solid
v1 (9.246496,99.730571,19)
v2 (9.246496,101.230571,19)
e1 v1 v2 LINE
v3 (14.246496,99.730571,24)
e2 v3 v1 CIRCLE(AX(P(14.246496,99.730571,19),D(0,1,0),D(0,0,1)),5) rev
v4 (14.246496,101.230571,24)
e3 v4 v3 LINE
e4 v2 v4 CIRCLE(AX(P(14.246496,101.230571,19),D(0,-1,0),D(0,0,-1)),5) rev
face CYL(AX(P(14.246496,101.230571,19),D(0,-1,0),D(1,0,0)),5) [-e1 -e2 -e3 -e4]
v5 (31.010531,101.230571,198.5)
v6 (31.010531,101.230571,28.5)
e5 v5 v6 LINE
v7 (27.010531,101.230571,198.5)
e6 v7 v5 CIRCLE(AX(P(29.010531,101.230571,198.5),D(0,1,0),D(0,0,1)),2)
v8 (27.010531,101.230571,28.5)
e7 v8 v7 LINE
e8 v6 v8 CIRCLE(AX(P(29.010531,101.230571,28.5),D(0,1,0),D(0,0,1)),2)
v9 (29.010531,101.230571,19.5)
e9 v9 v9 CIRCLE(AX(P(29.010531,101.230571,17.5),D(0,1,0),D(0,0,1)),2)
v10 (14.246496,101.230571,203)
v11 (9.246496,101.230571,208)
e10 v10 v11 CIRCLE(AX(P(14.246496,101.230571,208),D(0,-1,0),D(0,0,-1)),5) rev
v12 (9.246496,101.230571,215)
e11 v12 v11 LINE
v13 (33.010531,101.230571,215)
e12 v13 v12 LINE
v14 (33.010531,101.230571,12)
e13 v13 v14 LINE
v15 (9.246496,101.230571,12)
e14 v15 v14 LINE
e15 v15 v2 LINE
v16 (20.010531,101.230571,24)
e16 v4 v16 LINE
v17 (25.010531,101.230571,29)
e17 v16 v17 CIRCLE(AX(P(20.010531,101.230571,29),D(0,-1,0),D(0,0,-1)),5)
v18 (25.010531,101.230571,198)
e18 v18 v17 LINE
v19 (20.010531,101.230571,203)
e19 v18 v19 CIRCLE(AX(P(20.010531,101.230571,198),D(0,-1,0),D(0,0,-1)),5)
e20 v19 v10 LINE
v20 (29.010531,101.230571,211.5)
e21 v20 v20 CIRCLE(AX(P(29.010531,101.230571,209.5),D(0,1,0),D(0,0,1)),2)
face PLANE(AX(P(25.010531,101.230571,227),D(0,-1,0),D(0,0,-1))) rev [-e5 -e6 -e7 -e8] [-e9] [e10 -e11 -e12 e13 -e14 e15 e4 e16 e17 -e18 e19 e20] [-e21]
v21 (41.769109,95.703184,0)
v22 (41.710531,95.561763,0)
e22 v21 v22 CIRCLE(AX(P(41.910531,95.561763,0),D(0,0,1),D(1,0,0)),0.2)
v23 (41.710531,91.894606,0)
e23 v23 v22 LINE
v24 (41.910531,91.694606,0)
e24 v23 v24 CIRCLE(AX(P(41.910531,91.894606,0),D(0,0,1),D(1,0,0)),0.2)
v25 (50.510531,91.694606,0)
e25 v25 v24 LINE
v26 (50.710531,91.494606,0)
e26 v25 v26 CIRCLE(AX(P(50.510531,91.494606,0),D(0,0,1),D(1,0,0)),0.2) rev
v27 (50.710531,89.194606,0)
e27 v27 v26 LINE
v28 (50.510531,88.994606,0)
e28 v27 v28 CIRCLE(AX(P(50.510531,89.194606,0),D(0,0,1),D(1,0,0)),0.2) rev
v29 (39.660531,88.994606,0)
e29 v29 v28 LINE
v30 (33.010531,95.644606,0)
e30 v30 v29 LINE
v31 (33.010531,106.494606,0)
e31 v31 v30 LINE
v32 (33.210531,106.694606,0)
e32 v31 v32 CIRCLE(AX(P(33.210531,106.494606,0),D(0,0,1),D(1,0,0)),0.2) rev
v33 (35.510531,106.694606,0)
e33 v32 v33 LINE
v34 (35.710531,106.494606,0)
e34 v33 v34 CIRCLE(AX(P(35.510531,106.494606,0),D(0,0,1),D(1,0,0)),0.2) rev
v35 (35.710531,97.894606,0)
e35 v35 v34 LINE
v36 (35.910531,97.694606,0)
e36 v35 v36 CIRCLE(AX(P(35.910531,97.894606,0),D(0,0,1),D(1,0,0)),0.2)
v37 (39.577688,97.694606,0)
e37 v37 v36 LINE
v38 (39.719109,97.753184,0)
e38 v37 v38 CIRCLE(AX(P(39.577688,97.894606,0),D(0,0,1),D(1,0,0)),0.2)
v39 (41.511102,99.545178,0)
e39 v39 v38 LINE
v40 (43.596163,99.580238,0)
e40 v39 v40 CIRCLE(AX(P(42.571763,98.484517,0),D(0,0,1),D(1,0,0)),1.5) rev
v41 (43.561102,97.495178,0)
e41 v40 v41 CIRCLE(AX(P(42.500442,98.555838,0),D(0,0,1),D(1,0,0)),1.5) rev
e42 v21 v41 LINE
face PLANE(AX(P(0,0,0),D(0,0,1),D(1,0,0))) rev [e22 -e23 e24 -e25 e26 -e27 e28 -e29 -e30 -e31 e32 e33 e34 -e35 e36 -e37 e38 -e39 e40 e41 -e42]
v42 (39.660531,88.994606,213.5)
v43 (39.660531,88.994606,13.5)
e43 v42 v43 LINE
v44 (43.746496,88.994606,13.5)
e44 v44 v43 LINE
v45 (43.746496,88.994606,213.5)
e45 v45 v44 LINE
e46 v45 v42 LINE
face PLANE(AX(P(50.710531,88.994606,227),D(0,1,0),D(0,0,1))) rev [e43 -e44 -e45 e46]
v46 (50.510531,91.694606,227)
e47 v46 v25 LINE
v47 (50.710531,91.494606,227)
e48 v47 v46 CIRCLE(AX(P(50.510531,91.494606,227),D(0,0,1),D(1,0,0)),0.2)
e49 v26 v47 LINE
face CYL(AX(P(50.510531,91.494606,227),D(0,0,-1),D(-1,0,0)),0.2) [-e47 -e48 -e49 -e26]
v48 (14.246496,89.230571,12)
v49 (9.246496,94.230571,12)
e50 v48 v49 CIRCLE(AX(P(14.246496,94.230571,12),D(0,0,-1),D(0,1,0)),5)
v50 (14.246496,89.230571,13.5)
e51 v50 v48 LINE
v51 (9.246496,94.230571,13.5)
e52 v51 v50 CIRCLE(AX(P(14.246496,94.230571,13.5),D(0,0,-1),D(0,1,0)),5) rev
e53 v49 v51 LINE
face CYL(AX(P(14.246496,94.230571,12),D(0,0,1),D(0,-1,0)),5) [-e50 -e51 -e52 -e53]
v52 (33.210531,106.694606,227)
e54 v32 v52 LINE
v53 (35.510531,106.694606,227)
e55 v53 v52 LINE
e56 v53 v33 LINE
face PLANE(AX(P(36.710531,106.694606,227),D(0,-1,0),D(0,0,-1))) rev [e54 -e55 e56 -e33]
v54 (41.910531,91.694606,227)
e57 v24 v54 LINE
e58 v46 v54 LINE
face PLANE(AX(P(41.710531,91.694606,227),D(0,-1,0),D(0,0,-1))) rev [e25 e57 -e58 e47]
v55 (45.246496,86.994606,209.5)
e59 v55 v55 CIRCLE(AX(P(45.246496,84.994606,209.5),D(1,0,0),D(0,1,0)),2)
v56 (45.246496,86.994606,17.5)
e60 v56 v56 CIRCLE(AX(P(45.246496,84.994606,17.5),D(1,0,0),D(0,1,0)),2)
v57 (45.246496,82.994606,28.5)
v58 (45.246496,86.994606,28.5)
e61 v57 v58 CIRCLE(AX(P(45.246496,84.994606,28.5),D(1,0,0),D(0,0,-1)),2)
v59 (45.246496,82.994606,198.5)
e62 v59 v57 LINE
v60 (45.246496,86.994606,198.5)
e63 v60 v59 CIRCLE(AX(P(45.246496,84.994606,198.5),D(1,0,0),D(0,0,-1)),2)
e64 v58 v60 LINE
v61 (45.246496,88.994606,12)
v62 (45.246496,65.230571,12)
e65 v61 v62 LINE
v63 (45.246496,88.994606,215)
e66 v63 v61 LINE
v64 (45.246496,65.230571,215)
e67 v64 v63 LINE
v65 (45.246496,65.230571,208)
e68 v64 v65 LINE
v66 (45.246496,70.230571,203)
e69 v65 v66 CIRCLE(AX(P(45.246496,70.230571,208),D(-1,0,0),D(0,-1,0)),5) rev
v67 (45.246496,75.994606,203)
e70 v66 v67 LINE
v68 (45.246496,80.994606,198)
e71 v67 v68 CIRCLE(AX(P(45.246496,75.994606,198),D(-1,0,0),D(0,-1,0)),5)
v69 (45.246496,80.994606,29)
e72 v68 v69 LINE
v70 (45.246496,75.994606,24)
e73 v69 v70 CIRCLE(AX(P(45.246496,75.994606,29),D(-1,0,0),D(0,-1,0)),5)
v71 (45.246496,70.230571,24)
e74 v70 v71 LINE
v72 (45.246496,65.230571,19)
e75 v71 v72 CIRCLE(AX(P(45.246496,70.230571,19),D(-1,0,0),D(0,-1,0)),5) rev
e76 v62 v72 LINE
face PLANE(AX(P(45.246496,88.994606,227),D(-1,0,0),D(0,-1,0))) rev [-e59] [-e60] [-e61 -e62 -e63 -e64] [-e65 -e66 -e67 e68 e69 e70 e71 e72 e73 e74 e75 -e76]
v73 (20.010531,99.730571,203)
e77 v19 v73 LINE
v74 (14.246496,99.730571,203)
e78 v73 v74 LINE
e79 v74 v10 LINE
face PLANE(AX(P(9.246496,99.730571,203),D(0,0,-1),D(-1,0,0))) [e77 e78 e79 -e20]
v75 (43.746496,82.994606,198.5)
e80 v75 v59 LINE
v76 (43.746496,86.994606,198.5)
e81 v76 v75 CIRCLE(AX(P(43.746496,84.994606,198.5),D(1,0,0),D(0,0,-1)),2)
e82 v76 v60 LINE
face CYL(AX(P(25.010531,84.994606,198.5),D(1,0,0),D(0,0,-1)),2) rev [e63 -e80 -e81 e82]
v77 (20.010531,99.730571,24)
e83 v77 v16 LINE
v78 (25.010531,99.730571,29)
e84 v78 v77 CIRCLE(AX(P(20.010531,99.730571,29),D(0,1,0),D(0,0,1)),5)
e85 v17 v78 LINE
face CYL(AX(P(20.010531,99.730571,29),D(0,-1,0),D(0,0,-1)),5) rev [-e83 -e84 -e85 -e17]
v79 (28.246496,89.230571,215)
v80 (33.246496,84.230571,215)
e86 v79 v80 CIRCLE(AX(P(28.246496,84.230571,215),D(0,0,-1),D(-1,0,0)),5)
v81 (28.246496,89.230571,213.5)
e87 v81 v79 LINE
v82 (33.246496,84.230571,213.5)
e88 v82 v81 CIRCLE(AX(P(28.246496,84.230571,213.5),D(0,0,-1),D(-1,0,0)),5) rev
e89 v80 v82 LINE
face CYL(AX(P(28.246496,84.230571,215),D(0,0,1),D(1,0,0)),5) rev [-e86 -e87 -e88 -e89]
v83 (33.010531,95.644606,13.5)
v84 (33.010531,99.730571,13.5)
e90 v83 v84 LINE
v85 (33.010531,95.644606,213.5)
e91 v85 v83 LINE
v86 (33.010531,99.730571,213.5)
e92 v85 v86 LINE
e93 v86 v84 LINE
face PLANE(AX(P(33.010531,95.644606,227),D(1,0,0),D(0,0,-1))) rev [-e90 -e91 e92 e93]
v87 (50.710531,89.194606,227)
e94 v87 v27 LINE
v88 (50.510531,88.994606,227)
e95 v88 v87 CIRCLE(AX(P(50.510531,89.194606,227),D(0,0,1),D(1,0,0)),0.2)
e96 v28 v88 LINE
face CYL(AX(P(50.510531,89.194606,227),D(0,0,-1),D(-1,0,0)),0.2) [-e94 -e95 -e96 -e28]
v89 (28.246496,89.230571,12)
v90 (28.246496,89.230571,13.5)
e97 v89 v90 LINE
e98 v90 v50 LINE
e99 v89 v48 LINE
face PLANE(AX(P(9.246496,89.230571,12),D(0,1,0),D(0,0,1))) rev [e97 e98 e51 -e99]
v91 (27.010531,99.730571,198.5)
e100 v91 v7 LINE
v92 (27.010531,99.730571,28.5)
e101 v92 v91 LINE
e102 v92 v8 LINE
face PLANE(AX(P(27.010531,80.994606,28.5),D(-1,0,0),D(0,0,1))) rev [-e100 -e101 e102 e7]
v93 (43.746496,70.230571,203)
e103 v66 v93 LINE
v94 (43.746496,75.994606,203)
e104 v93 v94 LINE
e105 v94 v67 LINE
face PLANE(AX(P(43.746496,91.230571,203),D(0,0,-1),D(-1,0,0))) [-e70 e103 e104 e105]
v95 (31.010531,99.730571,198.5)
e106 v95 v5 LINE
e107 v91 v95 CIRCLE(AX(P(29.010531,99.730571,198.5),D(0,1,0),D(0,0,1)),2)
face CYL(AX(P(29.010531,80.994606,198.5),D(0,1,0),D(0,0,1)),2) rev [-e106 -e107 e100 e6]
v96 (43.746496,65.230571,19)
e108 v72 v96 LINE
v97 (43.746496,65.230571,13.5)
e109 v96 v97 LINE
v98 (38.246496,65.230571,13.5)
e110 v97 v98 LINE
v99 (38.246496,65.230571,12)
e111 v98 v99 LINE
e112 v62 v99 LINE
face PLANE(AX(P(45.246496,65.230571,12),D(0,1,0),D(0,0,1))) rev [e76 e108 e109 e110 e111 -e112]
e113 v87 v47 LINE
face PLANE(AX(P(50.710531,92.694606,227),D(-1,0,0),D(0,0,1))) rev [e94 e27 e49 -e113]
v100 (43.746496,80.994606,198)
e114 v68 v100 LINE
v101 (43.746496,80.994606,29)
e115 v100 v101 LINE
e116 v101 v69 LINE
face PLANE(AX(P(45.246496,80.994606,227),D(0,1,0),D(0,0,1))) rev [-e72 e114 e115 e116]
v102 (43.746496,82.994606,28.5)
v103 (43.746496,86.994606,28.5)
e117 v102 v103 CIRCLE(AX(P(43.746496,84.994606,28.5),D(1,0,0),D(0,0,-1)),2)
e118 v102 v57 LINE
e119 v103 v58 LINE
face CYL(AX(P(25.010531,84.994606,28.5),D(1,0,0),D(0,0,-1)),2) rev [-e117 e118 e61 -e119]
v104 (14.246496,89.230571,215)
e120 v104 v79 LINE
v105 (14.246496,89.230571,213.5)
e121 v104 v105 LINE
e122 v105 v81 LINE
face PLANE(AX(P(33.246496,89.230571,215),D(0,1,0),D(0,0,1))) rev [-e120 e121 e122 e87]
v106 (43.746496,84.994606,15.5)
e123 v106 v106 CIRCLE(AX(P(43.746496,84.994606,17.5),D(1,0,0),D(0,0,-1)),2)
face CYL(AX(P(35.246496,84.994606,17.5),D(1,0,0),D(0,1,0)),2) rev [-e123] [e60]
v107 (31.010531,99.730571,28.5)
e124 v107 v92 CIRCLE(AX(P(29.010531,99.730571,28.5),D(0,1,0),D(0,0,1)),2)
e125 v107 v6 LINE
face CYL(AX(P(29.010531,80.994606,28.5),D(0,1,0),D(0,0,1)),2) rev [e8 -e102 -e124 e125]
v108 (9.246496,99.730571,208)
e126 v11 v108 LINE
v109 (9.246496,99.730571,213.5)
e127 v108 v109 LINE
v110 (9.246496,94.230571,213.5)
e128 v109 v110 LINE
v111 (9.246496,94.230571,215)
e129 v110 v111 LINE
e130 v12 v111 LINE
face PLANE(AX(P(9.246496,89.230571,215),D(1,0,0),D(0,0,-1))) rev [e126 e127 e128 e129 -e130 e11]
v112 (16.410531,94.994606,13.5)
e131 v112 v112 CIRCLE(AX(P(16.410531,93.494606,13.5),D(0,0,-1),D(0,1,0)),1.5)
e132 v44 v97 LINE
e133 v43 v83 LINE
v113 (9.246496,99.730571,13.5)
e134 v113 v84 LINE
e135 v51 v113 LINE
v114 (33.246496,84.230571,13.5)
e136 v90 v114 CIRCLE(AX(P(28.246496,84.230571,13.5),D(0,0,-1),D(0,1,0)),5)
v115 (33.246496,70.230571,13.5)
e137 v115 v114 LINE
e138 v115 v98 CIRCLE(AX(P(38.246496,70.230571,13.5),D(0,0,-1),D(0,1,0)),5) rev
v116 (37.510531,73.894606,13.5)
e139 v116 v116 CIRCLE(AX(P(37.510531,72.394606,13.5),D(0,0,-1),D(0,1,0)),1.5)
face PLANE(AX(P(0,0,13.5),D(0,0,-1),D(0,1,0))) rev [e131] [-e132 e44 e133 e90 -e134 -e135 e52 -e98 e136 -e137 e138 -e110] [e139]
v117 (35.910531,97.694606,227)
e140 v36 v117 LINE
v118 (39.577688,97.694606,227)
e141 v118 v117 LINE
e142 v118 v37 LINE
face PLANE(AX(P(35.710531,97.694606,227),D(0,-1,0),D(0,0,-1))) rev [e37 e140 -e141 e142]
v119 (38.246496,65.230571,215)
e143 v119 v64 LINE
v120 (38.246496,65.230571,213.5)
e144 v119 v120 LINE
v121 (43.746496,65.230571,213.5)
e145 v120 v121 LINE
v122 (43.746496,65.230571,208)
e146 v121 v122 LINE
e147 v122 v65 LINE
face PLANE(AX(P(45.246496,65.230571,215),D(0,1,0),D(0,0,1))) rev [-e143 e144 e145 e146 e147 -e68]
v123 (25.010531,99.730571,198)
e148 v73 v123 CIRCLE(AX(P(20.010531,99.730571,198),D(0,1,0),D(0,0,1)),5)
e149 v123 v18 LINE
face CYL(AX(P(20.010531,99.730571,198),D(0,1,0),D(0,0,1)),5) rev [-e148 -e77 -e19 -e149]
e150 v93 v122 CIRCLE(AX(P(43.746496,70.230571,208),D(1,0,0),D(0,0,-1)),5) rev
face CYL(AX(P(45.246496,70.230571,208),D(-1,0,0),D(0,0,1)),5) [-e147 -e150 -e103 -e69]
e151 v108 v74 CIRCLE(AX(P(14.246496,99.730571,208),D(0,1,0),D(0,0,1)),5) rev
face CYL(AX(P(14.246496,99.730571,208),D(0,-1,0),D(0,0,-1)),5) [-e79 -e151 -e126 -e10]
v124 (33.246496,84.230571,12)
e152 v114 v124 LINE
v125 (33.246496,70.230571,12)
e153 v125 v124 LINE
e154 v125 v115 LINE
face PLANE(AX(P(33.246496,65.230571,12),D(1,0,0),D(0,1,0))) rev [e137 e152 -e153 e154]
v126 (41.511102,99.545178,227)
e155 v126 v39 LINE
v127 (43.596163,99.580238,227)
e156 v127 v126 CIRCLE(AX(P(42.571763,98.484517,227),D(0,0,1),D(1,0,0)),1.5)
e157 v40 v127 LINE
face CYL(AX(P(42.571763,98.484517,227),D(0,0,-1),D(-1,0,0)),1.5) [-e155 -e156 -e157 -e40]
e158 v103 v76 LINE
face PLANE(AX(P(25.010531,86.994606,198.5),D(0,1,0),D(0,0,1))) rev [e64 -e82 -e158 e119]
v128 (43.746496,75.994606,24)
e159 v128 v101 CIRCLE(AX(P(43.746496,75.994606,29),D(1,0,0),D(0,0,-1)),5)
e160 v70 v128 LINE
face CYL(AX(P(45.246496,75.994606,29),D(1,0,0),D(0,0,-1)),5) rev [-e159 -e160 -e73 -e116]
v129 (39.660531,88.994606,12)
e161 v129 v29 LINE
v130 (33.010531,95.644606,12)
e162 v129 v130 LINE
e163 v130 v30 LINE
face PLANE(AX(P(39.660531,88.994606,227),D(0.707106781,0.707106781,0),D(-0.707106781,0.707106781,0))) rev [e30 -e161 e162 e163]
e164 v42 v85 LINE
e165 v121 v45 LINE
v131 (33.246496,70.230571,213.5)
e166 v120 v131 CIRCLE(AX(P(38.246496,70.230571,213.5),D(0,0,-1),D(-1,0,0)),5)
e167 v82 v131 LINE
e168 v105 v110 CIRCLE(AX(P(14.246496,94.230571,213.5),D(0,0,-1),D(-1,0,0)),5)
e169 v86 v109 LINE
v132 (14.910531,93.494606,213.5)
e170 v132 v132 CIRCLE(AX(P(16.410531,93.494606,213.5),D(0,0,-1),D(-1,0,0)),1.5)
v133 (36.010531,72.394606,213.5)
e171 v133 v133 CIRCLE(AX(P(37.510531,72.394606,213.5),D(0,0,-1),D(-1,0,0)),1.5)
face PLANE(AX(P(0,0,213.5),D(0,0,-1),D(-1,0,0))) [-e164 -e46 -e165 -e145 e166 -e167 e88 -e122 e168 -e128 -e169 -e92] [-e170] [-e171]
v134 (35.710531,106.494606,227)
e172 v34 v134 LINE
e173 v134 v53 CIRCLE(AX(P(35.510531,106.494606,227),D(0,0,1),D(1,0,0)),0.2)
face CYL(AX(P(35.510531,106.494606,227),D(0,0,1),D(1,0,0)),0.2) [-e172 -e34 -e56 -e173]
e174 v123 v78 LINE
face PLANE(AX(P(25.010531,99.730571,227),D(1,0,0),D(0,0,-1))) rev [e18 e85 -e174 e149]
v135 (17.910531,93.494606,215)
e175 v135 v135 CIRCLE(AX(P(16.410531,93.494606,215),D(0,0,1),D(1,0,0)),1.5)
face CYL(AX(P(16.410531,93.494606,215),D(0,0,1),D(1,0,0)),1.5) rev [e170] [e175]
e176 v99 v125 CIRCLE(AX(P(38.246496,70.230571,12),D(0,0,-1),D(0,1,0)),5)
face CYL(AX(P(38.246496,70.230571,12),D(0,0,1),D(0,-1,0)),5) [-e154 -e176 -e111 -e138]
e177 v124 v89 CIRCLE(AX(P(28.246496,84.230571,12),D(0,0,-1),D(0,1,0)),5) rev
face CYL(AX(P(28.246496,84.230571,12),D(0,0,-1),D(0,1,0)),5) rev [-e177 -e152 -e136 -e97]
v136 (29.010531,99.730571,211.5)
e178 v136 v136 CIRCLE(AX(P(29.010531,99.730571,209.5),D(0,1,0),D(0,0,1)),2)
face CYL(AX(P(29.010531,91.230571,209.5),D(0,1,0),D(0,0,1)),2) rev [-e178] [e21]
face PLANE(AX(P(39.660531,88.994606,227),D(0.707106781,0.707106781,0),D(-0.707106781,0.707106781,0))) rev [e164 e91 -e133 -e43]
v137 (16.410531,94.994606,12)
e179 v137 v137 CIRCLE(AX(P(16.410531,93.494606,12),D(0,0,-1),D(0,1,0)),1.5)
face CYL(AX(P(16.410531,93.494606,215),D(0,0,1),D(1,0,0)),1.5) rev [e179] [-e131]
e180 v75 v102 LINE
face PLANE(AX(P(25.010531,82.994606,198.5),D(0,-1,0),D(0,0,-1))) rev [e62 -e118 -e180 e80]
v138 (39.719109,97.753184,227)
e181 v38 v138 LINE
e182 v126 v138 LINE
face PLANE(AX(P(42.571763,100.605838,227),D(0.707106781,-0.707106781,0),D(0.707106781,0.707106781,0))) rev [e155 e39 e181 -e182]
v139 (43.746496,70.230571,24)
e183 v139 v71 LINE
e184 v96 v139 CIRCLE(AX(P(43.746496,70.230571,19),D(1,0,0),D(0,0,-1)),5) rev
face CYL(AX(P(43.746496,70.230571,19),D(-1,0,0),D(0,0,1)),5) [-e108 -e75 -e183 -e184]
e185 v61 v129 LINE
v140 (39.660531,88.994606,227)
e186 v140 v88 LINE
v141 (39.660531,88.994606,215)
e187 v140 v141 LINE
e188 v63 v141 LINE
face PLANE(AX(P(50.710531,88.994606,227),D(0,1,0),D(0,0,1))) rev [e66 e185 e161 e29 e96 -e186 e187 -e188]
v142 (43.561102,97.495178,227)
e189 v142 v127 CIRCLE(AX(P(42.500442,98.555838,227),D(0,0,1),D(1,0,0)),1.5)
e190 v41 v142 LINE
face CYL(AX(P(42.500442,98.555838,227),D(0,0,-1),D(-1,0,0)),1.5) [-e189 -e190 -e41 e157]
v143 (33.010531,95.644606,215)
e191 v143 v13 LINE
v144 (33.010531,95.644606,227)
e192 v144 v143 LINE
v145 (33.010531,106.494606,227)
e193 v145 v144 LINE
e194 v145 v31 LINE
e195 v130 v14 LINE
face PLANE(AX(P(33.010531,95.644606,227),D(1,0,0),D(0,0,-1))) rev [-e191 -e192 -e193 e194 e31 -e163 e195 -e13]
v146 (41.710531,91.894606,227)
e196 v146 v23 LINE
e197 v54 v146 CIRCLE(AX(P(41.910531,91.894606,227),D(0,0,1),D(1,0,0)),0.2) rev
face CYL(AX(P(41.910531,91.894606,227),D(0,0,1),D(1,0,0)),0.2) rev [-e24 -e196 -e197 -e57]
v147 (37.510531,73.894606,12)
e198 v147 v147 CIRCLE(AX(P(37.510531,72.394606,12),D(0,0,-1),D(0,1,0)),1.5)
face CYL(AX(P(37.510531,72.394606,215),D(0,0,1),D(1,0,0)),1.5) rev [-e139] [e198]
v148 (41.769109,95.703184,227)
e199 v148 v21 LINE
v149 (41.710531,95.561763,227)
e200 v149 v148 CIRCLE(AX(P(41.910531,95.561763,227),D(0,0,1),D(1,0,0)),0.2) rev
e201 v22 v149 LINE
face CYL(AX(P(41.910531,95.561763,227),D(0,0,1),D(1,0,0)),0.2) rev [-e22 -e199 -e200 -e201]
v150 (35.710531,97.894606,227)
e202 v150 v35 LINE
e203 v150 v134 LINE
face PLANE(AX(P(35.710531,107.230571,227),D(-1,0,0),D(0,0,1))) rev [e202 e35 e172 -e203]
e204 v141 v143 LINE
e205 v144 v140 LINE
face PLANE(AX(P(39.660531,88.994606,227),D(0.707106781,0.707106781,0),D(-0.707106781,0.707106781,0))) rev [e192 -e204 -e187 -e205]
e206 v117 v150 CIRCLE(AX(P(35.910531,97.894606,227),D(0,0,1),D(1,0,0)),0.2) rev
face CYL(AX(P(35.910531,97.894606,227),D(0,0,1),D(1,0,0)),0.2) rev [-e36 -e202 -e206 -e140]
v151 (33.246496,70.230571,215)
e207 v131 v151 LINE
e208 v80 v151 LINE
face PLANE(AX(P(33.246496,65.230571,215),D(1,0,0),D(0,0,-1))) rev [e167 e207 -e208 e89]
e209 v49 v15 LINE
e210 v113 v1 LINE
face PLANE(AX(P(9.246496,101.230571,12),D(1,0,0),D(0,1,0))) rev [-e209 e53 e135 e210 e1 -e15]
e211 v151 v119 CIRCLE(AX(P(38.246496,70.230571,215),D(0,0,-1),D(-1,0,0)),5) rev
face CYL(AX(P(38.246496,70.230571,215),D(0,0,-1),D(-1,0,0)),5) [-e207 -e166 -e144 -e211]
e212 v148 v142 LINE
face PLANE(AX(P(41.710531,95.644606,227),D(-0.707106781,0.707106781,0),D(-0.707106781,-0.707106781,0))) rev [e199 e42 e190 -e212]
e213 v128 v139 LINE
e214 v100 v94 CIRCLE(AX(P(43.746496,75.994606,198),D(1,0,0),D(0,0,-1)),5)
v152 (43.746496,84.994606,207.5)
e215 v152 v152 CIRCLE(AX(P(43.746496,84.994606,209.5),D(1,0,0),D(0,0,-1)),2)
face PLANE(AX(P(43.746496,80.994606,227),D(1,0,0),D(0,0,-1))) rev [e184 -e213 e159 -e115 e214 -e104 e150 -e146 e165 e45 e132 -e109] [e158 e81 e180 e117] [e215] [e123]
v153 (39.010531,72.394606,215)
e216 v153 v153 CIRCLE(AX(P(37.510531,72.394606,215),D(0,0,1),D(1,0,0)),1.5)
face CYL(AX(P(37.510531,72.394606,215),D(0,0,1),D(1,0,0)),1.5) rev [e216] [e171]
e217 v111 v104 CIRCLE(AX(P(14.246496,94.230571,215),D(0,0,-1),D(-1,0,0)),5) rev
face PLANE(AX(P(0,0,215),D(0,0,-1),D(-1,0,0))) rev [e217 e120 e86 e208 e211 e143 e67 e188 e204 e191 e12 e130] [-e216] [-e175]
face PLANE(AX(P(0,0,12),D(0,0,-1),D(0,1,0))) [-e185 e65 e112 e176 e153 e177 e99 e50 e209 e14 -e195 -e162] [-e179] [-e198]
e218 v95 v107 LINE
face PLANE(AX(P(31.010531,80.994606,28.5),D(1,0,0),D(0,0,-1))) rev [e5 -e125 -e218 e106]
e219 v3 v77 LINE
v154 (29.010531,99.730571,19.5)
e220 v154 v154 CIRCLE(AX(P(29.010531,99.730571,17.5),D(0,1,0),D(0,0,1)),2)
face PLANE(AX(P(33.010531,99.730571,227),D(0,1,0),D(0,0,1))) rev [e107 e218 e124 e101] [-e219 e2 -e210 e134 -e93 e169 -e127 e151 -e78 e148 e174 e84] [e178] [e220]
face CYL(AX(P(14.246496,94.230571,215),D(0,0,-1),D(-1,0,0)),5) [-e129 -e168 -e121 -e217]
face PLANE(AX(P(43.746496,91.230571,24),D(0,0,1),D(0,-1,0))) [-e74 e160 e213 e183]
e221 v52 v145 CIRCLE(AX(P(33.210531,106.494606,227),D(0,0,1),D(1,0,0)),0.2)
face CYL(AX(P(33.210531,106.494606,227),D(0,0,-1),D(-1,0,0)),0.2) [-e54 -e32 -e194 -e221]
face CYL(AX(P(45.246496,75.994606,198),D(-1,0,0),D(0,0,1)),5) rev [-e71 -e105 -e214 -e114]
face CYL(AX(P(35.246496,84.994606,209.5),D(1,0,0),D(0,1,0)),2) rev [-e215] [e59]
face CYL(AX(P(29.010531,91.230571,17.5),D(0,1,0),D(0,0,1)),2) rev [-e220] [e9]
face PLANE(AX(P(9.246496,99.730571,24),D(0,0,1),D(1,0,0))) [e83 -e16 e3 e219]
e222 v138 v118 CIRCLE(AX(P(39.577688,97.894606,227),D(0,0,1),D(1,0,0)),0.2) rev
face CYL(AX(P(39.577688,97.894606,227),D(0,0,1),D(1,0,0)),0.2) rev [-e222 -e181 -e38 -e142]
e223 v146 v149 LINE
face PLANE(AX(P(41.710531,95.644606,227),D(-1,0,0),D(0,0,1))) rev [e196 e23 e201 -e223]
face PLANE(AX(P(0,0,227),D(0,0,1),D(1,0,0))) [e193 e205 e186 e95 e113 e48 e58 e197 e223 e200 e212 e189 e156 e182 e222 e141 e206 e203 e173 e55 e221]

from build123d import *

# Parameters (mm, degrees)
BOSS_EXTRUDE1_DEPTH   = 227
CUT_EXTRUDE1_DEPTH    = 257.229581821
SKETCH3_W             = 10
SKETCH3_H             = 15.5
CUT_EXTRUDE2_DEPTH    = 234.473879022
SKETCH4_W             = 15.5
SKETCH4_H             = 10
CUT_EXTRUDE3_DEPTH    = 252.639093083
FILLET3_R             = 1.5
BOSS_EXTRUDE3_DEPTH   = 1.5
BOSS_EXTRUDE4_DEPTH   = 1.5
SKETCH9_W             = 26
SKETCH9_H             = 12
BOSS_EXTRUDE5_DEPTH   = 1.5
SKETCH10_W            = 12
SKETCH10_H            = 26
BOSS_EXTRUDE6_DEPTH   = 1.5
FILLET7_R             = 5
SKETCH11_R            = 2
CUT_EXTRUDE4_DEPTH    = 10
SKETCH12_R            = 2
CUT_EXTRUDE5_DEPTH    = 10
FILLET8_R             = 0.2
F_3_0MM_DOWEL_HOLE1_D = 3
F_3_0MM_DOWEL_HOLE2_D = 3


with BuildPart() as part:
    # Sketch1 → Boss-Extrude1 (new body)
    with BuildSketch(Plane.XY):
        Polygon((5.710530524, 107.230570717), (35.710530524, 107.230570717), (35.710530524, 97.694605712), (39.660530524, 97.694605712), (42.571762587, 100.605837775), (44.621762586, 98.555837776), (41.710530523, 95.644605712), (41.710530523, 91.694605712), (51.246495528, 91.694605712), (51.246495528, 61.694605712), align=None)
    extrude(amount=BOSS_EXTRUDE1_DEPTH)

    # Sketch2 → Cut-Extrude1 (cut, through all)
    with BuildSketch(Plane(origin=(0, 0, 0), x_dir=(-1, 0, 0), z_dir=(0, 0, -1))):
        Polygon((-45.246495528, 88.994605712), (-45.246495528, 80.994605712), (-43.746495528, 80.994605712), (-43.746495528, 88.994605712), (-39.660530524, 88.994605712), (-33.010530524, 95.644605712), (-33.010530524, 99.730570717), (-25.010530524, 99.730570717), (-25.010530524, 101.230570717), (-33.010530524, 101.230570717), (-33.010530524, 106.694605712), (-36.710530524, 106.694605712), (-36.710530524, 108.694605712), (27.289469476, 108.694605712), (-52.710530523, 28.694605712), (-52.710530523, 92.694605712), (-50.710530523, 92.694605712), (-50.710530523, 88.994605712), align=None)
    extrude(amount=-CUT_EXTRUDE1_DEPTH, mode=Mode.SUBTRACT)

    # Sketch3 → Cut-Extrude2 (cut, through all)
    with BuildSketch(Plane(origin=(0, 101.230570717, 0), x_dir=(1, 0, 0), z_dir=(0, 1, 0))):
        with Locations((28.010530524, -5.75)):
            Rectangle(SKETCH3_W, SKETCH3_H)
        with Locations((28.010530524, -221.25)):
            Rectangle(SKETCH3_W, SKETCH3_H)
        with BuildLine():
            Line((31.010530524, -28.5), (31.010530524, -198.5))
            ThreePointArc((31.010530524, -198.5), (29.010530524, -200.5), (27.010530524, -198.5))
            Line((27.010530524, -198.5), (27.010530524, -28.5))
            ThreePointArc((27.010530524, -28.5), (29.010530524, -26.5), (31.010530524, -28.5))
        make_face()
    extrude(amount=-CUT_EXTRUDE2_DEPTH, mode=Mode.SUBTRACT)

    # Sketch4 → Cut-Extrude3 (cut, through all)
    with BuildSketch(Plane(origin=(45.246495528, 0, 0), x_dir=(0, 0, -1), z_dir=(1, 0, 0))):
        with Locations((-221.25, 83.994605712)):
            Rectangle(SKETCH4_W, SKETCH4_H)
        with Locations((-5.75, 83.994605712)):
            Rectangle(SKETCH4_W, SKETCH4_H)
        with BuildLine():
            Line((-198.5, 86.994605712), (-28.5, 86.994605712))
            ThreePointArc((-28.5, 86.994605712), (-26.5, 84.994605712), (-28.5, 82.994605712))
            Line((-28.5, 82.994605712), (-198.5, 82.994605712))
            ThreePointArc((-198.5, 82.994605712), (-200.5, 84.994605712), (-198.5, 86.994605712))
        make_face()
    extrude(amount=-CUT_EXTRUDE3_DEPTH, mode=Mode.SUBTRACT)

    # Fillet3
    # the kernel refuses this fillet: 1.5 mm, written as the material it takes off along each edge
    with BuildSketch(Plane(origin=(44.621762586, 98.555837776, -3.75), x_dir=(-0.7071067811865522, -0.7071067811865428, 0), z_dir=(0, 0, 1)), Plane(origin=(42.571762587, 100.605837775, -3.75), x_dir=(0.7071067811865476, -0.7071067811865476, 0), z_dir=(0, 0, 1))) as fillet3_piece_1:
        with BuildLine():
            CenterArc((FILLET3_R, -FILLET3_R), FILLET3_R, 90, 90)
            Line((0, -FILLET3_R), (0, 0))
            Line((0, 0), (FILLET3_R, 0))
        make_face()
    extrude(amount=234.5, mode=Mode.SUBTRACT)

    # Sketch6 → Boss-Extrude3 (add)
    with BuildSketch(Plane(origin=(0, 0, 13.5), x_dir=(-1, 0, 0), z_dir=(0, 0, -1))):
        Polygon((-45.246495528, 90.194605712), (-45.246495528, 65.230570717), (-33.246495528, 65.230570717), (-33.246495528, 89.230570717), (-9.246495528, 89.230570717), (-9.246495528, 101.230570717), (-34.210530524, 101.230570717), (-34.210530524, 96.230570717), (-40.246495528, 90.194605712), align=None)
    extrude(amount=BOSS_EXTRUDE3_DEPTH)

    # Sketch7 → Boss-Extrude4 (add)
    with BuildSketch(Plane.XY.offset(213.5)):
        Polygon((9.246495528, 101.230570717), (34.210530524, 101.230570717), (34.210530524, 96.230570717), (40.246495528, 90.194605712), (45.246495528, 90.194605712), (45.246495528, 65.230570717), (33.246495528, 65.230570717), (33.246495528, 89.230570717), (9.246495528, 89.230570717), align=None)
    extrude(amount=BOSS_EXTRUDE4_DEPTH)

    # Sketch9 → Boss-Extrude5 (add)
    with BuildSketch(Plane(origin=(0, 101.230570717, 0), x_dir=(1, 0, 0), z_dir=(0, 1, 0))):
        with Locations((22.246495528, -209)):
            Rectangle(SKETCH9_W, SKETCH9_H)
        with Locations((22.246495528, -18)):
            Rectangle(SKETCH9_W, SKETCH9_H)
    extrude(amount=-BOSS_EXTRUDE5_DEPTH)

    # Sketch10 → Boss-Extrude6 (add)
    with BuildSketch(Plane(origin=(45.246495528, 0, 0), x_dir=(0, 0, -1), z_dir=(1, 0, 0))):
        with Locations((-209, 78.230570717)):
            Rectangle(SKETCH10_W, SKETCH10_H)
        with Locations((-18, 78.230570717)):
            Rectangle(SKETCH10_W, SKETCH10_H)
    extrude(amount=-BOSS_EXTRUDE6_DEPTH)

    # Fillet7
    fillet7_edges = [part.edges().sort_by_distance(p)[0] for p in [
        (33.246495528, 65.230570717, 12.75),
        (33.246495528, 89.230570717, 12.75),
        (9.246495528, 89.230570717, 12.75),
        (9.246495528, 89.230570717, 214.25),
        (33.246495528, 89.230570717, 214.25),
        (33.246495528, 65.230570717, 214.25),
        (9.246495528, 100.480570717, 203),
        (25.010530524, 100.480570717, 203),
        (9.246495528, 100.480570717, 24),
        (25.010530524, 100.480570717, 24),
        (44.496495528, 65.230570717, 203),
        (44.496495528, 80.994605712, 203),
        (44.496495528, 65.230570717, 24),
        (44.496495528, 80.994605712, 24),
    ]]
    fillet(fillet7_edges, radius=FILLET7_R)

    # Sketch11 → Cut-Extrude4 (cut)
    with BuildSketch(Plane(origin=(45.246495528, 0, 0), x_dir=(0, 0, -1), z_dir=(1, 0, 0))):
        with Locations(Location((-209.5, 84.994605712, 0), (0, 0, 90))):
            Circle(SKETCH11_R)
        with Locations(Location((-17.5, 84.994605712, 0), (0, 0, 90))):
            Circle(SKETCH11_R)
    extrude(amount=-CUT_EXTRUDE4_DEPTH, mode=Mode.SUBTRACT)

    # Sketch12 → Cut-Extrude5 (cut)
    with BuildSketch(Plane(origin=(0, 101.230570717, 0), x_dir=(1, 0, 0), z_dir=(0, 1, 0))):
        with Locations(Location((29.010530524, -17.5, 0), (0, 0, 270))):
            Circle(SKETCH12_R)
        with Locations(Location((29.010530524, -209.5, 0), (0, 0, 270))):
            Circle(SKETCH12_R)
    extrude(amount=-CUT_EXTRUDE5_DEPTH, mode=Mode.SUBTRACT)

    # Fillet8
    fillet8_edges = [part.edges().sort_by_distance(p)[0] for p in [
        (35.710530524, 97.694605712, 113.5),
        (39.660530524, 97.694605712, 113.5),
        (41.710530523, 95.644605712, 113.5),
        (41.710530523, 91.694605712, 113.5),
        (50.710530523, 91.694605712, 113.5),
        (35.710530524, 106.694605712, 113.5),
        (33.010530524, 106.694605712, 113.5),
        (50.710530523, 88.994605712, 113.5),
    ]]
    fillet(fillet8_edges, radius=FILLET8_R)

    # Ø3.0mm Dowel Hole1 (through all)
    with Locations(Plane.XY.offset(215)):
        with Locations((16.410530524, 93.494605712)):
            Hole(F_3_0MM_DOWEL_HOLE1_D / 2)

    # Ø3.0mm Dowel Hole2 (through all)
    with Locations(Plane.XY.offset(215)):
        with Locations((37.510530524, 72.394605712)):
            Hole(F_3_0MM_DOWEL_HOLE2_D / 2)


solid = part.part
